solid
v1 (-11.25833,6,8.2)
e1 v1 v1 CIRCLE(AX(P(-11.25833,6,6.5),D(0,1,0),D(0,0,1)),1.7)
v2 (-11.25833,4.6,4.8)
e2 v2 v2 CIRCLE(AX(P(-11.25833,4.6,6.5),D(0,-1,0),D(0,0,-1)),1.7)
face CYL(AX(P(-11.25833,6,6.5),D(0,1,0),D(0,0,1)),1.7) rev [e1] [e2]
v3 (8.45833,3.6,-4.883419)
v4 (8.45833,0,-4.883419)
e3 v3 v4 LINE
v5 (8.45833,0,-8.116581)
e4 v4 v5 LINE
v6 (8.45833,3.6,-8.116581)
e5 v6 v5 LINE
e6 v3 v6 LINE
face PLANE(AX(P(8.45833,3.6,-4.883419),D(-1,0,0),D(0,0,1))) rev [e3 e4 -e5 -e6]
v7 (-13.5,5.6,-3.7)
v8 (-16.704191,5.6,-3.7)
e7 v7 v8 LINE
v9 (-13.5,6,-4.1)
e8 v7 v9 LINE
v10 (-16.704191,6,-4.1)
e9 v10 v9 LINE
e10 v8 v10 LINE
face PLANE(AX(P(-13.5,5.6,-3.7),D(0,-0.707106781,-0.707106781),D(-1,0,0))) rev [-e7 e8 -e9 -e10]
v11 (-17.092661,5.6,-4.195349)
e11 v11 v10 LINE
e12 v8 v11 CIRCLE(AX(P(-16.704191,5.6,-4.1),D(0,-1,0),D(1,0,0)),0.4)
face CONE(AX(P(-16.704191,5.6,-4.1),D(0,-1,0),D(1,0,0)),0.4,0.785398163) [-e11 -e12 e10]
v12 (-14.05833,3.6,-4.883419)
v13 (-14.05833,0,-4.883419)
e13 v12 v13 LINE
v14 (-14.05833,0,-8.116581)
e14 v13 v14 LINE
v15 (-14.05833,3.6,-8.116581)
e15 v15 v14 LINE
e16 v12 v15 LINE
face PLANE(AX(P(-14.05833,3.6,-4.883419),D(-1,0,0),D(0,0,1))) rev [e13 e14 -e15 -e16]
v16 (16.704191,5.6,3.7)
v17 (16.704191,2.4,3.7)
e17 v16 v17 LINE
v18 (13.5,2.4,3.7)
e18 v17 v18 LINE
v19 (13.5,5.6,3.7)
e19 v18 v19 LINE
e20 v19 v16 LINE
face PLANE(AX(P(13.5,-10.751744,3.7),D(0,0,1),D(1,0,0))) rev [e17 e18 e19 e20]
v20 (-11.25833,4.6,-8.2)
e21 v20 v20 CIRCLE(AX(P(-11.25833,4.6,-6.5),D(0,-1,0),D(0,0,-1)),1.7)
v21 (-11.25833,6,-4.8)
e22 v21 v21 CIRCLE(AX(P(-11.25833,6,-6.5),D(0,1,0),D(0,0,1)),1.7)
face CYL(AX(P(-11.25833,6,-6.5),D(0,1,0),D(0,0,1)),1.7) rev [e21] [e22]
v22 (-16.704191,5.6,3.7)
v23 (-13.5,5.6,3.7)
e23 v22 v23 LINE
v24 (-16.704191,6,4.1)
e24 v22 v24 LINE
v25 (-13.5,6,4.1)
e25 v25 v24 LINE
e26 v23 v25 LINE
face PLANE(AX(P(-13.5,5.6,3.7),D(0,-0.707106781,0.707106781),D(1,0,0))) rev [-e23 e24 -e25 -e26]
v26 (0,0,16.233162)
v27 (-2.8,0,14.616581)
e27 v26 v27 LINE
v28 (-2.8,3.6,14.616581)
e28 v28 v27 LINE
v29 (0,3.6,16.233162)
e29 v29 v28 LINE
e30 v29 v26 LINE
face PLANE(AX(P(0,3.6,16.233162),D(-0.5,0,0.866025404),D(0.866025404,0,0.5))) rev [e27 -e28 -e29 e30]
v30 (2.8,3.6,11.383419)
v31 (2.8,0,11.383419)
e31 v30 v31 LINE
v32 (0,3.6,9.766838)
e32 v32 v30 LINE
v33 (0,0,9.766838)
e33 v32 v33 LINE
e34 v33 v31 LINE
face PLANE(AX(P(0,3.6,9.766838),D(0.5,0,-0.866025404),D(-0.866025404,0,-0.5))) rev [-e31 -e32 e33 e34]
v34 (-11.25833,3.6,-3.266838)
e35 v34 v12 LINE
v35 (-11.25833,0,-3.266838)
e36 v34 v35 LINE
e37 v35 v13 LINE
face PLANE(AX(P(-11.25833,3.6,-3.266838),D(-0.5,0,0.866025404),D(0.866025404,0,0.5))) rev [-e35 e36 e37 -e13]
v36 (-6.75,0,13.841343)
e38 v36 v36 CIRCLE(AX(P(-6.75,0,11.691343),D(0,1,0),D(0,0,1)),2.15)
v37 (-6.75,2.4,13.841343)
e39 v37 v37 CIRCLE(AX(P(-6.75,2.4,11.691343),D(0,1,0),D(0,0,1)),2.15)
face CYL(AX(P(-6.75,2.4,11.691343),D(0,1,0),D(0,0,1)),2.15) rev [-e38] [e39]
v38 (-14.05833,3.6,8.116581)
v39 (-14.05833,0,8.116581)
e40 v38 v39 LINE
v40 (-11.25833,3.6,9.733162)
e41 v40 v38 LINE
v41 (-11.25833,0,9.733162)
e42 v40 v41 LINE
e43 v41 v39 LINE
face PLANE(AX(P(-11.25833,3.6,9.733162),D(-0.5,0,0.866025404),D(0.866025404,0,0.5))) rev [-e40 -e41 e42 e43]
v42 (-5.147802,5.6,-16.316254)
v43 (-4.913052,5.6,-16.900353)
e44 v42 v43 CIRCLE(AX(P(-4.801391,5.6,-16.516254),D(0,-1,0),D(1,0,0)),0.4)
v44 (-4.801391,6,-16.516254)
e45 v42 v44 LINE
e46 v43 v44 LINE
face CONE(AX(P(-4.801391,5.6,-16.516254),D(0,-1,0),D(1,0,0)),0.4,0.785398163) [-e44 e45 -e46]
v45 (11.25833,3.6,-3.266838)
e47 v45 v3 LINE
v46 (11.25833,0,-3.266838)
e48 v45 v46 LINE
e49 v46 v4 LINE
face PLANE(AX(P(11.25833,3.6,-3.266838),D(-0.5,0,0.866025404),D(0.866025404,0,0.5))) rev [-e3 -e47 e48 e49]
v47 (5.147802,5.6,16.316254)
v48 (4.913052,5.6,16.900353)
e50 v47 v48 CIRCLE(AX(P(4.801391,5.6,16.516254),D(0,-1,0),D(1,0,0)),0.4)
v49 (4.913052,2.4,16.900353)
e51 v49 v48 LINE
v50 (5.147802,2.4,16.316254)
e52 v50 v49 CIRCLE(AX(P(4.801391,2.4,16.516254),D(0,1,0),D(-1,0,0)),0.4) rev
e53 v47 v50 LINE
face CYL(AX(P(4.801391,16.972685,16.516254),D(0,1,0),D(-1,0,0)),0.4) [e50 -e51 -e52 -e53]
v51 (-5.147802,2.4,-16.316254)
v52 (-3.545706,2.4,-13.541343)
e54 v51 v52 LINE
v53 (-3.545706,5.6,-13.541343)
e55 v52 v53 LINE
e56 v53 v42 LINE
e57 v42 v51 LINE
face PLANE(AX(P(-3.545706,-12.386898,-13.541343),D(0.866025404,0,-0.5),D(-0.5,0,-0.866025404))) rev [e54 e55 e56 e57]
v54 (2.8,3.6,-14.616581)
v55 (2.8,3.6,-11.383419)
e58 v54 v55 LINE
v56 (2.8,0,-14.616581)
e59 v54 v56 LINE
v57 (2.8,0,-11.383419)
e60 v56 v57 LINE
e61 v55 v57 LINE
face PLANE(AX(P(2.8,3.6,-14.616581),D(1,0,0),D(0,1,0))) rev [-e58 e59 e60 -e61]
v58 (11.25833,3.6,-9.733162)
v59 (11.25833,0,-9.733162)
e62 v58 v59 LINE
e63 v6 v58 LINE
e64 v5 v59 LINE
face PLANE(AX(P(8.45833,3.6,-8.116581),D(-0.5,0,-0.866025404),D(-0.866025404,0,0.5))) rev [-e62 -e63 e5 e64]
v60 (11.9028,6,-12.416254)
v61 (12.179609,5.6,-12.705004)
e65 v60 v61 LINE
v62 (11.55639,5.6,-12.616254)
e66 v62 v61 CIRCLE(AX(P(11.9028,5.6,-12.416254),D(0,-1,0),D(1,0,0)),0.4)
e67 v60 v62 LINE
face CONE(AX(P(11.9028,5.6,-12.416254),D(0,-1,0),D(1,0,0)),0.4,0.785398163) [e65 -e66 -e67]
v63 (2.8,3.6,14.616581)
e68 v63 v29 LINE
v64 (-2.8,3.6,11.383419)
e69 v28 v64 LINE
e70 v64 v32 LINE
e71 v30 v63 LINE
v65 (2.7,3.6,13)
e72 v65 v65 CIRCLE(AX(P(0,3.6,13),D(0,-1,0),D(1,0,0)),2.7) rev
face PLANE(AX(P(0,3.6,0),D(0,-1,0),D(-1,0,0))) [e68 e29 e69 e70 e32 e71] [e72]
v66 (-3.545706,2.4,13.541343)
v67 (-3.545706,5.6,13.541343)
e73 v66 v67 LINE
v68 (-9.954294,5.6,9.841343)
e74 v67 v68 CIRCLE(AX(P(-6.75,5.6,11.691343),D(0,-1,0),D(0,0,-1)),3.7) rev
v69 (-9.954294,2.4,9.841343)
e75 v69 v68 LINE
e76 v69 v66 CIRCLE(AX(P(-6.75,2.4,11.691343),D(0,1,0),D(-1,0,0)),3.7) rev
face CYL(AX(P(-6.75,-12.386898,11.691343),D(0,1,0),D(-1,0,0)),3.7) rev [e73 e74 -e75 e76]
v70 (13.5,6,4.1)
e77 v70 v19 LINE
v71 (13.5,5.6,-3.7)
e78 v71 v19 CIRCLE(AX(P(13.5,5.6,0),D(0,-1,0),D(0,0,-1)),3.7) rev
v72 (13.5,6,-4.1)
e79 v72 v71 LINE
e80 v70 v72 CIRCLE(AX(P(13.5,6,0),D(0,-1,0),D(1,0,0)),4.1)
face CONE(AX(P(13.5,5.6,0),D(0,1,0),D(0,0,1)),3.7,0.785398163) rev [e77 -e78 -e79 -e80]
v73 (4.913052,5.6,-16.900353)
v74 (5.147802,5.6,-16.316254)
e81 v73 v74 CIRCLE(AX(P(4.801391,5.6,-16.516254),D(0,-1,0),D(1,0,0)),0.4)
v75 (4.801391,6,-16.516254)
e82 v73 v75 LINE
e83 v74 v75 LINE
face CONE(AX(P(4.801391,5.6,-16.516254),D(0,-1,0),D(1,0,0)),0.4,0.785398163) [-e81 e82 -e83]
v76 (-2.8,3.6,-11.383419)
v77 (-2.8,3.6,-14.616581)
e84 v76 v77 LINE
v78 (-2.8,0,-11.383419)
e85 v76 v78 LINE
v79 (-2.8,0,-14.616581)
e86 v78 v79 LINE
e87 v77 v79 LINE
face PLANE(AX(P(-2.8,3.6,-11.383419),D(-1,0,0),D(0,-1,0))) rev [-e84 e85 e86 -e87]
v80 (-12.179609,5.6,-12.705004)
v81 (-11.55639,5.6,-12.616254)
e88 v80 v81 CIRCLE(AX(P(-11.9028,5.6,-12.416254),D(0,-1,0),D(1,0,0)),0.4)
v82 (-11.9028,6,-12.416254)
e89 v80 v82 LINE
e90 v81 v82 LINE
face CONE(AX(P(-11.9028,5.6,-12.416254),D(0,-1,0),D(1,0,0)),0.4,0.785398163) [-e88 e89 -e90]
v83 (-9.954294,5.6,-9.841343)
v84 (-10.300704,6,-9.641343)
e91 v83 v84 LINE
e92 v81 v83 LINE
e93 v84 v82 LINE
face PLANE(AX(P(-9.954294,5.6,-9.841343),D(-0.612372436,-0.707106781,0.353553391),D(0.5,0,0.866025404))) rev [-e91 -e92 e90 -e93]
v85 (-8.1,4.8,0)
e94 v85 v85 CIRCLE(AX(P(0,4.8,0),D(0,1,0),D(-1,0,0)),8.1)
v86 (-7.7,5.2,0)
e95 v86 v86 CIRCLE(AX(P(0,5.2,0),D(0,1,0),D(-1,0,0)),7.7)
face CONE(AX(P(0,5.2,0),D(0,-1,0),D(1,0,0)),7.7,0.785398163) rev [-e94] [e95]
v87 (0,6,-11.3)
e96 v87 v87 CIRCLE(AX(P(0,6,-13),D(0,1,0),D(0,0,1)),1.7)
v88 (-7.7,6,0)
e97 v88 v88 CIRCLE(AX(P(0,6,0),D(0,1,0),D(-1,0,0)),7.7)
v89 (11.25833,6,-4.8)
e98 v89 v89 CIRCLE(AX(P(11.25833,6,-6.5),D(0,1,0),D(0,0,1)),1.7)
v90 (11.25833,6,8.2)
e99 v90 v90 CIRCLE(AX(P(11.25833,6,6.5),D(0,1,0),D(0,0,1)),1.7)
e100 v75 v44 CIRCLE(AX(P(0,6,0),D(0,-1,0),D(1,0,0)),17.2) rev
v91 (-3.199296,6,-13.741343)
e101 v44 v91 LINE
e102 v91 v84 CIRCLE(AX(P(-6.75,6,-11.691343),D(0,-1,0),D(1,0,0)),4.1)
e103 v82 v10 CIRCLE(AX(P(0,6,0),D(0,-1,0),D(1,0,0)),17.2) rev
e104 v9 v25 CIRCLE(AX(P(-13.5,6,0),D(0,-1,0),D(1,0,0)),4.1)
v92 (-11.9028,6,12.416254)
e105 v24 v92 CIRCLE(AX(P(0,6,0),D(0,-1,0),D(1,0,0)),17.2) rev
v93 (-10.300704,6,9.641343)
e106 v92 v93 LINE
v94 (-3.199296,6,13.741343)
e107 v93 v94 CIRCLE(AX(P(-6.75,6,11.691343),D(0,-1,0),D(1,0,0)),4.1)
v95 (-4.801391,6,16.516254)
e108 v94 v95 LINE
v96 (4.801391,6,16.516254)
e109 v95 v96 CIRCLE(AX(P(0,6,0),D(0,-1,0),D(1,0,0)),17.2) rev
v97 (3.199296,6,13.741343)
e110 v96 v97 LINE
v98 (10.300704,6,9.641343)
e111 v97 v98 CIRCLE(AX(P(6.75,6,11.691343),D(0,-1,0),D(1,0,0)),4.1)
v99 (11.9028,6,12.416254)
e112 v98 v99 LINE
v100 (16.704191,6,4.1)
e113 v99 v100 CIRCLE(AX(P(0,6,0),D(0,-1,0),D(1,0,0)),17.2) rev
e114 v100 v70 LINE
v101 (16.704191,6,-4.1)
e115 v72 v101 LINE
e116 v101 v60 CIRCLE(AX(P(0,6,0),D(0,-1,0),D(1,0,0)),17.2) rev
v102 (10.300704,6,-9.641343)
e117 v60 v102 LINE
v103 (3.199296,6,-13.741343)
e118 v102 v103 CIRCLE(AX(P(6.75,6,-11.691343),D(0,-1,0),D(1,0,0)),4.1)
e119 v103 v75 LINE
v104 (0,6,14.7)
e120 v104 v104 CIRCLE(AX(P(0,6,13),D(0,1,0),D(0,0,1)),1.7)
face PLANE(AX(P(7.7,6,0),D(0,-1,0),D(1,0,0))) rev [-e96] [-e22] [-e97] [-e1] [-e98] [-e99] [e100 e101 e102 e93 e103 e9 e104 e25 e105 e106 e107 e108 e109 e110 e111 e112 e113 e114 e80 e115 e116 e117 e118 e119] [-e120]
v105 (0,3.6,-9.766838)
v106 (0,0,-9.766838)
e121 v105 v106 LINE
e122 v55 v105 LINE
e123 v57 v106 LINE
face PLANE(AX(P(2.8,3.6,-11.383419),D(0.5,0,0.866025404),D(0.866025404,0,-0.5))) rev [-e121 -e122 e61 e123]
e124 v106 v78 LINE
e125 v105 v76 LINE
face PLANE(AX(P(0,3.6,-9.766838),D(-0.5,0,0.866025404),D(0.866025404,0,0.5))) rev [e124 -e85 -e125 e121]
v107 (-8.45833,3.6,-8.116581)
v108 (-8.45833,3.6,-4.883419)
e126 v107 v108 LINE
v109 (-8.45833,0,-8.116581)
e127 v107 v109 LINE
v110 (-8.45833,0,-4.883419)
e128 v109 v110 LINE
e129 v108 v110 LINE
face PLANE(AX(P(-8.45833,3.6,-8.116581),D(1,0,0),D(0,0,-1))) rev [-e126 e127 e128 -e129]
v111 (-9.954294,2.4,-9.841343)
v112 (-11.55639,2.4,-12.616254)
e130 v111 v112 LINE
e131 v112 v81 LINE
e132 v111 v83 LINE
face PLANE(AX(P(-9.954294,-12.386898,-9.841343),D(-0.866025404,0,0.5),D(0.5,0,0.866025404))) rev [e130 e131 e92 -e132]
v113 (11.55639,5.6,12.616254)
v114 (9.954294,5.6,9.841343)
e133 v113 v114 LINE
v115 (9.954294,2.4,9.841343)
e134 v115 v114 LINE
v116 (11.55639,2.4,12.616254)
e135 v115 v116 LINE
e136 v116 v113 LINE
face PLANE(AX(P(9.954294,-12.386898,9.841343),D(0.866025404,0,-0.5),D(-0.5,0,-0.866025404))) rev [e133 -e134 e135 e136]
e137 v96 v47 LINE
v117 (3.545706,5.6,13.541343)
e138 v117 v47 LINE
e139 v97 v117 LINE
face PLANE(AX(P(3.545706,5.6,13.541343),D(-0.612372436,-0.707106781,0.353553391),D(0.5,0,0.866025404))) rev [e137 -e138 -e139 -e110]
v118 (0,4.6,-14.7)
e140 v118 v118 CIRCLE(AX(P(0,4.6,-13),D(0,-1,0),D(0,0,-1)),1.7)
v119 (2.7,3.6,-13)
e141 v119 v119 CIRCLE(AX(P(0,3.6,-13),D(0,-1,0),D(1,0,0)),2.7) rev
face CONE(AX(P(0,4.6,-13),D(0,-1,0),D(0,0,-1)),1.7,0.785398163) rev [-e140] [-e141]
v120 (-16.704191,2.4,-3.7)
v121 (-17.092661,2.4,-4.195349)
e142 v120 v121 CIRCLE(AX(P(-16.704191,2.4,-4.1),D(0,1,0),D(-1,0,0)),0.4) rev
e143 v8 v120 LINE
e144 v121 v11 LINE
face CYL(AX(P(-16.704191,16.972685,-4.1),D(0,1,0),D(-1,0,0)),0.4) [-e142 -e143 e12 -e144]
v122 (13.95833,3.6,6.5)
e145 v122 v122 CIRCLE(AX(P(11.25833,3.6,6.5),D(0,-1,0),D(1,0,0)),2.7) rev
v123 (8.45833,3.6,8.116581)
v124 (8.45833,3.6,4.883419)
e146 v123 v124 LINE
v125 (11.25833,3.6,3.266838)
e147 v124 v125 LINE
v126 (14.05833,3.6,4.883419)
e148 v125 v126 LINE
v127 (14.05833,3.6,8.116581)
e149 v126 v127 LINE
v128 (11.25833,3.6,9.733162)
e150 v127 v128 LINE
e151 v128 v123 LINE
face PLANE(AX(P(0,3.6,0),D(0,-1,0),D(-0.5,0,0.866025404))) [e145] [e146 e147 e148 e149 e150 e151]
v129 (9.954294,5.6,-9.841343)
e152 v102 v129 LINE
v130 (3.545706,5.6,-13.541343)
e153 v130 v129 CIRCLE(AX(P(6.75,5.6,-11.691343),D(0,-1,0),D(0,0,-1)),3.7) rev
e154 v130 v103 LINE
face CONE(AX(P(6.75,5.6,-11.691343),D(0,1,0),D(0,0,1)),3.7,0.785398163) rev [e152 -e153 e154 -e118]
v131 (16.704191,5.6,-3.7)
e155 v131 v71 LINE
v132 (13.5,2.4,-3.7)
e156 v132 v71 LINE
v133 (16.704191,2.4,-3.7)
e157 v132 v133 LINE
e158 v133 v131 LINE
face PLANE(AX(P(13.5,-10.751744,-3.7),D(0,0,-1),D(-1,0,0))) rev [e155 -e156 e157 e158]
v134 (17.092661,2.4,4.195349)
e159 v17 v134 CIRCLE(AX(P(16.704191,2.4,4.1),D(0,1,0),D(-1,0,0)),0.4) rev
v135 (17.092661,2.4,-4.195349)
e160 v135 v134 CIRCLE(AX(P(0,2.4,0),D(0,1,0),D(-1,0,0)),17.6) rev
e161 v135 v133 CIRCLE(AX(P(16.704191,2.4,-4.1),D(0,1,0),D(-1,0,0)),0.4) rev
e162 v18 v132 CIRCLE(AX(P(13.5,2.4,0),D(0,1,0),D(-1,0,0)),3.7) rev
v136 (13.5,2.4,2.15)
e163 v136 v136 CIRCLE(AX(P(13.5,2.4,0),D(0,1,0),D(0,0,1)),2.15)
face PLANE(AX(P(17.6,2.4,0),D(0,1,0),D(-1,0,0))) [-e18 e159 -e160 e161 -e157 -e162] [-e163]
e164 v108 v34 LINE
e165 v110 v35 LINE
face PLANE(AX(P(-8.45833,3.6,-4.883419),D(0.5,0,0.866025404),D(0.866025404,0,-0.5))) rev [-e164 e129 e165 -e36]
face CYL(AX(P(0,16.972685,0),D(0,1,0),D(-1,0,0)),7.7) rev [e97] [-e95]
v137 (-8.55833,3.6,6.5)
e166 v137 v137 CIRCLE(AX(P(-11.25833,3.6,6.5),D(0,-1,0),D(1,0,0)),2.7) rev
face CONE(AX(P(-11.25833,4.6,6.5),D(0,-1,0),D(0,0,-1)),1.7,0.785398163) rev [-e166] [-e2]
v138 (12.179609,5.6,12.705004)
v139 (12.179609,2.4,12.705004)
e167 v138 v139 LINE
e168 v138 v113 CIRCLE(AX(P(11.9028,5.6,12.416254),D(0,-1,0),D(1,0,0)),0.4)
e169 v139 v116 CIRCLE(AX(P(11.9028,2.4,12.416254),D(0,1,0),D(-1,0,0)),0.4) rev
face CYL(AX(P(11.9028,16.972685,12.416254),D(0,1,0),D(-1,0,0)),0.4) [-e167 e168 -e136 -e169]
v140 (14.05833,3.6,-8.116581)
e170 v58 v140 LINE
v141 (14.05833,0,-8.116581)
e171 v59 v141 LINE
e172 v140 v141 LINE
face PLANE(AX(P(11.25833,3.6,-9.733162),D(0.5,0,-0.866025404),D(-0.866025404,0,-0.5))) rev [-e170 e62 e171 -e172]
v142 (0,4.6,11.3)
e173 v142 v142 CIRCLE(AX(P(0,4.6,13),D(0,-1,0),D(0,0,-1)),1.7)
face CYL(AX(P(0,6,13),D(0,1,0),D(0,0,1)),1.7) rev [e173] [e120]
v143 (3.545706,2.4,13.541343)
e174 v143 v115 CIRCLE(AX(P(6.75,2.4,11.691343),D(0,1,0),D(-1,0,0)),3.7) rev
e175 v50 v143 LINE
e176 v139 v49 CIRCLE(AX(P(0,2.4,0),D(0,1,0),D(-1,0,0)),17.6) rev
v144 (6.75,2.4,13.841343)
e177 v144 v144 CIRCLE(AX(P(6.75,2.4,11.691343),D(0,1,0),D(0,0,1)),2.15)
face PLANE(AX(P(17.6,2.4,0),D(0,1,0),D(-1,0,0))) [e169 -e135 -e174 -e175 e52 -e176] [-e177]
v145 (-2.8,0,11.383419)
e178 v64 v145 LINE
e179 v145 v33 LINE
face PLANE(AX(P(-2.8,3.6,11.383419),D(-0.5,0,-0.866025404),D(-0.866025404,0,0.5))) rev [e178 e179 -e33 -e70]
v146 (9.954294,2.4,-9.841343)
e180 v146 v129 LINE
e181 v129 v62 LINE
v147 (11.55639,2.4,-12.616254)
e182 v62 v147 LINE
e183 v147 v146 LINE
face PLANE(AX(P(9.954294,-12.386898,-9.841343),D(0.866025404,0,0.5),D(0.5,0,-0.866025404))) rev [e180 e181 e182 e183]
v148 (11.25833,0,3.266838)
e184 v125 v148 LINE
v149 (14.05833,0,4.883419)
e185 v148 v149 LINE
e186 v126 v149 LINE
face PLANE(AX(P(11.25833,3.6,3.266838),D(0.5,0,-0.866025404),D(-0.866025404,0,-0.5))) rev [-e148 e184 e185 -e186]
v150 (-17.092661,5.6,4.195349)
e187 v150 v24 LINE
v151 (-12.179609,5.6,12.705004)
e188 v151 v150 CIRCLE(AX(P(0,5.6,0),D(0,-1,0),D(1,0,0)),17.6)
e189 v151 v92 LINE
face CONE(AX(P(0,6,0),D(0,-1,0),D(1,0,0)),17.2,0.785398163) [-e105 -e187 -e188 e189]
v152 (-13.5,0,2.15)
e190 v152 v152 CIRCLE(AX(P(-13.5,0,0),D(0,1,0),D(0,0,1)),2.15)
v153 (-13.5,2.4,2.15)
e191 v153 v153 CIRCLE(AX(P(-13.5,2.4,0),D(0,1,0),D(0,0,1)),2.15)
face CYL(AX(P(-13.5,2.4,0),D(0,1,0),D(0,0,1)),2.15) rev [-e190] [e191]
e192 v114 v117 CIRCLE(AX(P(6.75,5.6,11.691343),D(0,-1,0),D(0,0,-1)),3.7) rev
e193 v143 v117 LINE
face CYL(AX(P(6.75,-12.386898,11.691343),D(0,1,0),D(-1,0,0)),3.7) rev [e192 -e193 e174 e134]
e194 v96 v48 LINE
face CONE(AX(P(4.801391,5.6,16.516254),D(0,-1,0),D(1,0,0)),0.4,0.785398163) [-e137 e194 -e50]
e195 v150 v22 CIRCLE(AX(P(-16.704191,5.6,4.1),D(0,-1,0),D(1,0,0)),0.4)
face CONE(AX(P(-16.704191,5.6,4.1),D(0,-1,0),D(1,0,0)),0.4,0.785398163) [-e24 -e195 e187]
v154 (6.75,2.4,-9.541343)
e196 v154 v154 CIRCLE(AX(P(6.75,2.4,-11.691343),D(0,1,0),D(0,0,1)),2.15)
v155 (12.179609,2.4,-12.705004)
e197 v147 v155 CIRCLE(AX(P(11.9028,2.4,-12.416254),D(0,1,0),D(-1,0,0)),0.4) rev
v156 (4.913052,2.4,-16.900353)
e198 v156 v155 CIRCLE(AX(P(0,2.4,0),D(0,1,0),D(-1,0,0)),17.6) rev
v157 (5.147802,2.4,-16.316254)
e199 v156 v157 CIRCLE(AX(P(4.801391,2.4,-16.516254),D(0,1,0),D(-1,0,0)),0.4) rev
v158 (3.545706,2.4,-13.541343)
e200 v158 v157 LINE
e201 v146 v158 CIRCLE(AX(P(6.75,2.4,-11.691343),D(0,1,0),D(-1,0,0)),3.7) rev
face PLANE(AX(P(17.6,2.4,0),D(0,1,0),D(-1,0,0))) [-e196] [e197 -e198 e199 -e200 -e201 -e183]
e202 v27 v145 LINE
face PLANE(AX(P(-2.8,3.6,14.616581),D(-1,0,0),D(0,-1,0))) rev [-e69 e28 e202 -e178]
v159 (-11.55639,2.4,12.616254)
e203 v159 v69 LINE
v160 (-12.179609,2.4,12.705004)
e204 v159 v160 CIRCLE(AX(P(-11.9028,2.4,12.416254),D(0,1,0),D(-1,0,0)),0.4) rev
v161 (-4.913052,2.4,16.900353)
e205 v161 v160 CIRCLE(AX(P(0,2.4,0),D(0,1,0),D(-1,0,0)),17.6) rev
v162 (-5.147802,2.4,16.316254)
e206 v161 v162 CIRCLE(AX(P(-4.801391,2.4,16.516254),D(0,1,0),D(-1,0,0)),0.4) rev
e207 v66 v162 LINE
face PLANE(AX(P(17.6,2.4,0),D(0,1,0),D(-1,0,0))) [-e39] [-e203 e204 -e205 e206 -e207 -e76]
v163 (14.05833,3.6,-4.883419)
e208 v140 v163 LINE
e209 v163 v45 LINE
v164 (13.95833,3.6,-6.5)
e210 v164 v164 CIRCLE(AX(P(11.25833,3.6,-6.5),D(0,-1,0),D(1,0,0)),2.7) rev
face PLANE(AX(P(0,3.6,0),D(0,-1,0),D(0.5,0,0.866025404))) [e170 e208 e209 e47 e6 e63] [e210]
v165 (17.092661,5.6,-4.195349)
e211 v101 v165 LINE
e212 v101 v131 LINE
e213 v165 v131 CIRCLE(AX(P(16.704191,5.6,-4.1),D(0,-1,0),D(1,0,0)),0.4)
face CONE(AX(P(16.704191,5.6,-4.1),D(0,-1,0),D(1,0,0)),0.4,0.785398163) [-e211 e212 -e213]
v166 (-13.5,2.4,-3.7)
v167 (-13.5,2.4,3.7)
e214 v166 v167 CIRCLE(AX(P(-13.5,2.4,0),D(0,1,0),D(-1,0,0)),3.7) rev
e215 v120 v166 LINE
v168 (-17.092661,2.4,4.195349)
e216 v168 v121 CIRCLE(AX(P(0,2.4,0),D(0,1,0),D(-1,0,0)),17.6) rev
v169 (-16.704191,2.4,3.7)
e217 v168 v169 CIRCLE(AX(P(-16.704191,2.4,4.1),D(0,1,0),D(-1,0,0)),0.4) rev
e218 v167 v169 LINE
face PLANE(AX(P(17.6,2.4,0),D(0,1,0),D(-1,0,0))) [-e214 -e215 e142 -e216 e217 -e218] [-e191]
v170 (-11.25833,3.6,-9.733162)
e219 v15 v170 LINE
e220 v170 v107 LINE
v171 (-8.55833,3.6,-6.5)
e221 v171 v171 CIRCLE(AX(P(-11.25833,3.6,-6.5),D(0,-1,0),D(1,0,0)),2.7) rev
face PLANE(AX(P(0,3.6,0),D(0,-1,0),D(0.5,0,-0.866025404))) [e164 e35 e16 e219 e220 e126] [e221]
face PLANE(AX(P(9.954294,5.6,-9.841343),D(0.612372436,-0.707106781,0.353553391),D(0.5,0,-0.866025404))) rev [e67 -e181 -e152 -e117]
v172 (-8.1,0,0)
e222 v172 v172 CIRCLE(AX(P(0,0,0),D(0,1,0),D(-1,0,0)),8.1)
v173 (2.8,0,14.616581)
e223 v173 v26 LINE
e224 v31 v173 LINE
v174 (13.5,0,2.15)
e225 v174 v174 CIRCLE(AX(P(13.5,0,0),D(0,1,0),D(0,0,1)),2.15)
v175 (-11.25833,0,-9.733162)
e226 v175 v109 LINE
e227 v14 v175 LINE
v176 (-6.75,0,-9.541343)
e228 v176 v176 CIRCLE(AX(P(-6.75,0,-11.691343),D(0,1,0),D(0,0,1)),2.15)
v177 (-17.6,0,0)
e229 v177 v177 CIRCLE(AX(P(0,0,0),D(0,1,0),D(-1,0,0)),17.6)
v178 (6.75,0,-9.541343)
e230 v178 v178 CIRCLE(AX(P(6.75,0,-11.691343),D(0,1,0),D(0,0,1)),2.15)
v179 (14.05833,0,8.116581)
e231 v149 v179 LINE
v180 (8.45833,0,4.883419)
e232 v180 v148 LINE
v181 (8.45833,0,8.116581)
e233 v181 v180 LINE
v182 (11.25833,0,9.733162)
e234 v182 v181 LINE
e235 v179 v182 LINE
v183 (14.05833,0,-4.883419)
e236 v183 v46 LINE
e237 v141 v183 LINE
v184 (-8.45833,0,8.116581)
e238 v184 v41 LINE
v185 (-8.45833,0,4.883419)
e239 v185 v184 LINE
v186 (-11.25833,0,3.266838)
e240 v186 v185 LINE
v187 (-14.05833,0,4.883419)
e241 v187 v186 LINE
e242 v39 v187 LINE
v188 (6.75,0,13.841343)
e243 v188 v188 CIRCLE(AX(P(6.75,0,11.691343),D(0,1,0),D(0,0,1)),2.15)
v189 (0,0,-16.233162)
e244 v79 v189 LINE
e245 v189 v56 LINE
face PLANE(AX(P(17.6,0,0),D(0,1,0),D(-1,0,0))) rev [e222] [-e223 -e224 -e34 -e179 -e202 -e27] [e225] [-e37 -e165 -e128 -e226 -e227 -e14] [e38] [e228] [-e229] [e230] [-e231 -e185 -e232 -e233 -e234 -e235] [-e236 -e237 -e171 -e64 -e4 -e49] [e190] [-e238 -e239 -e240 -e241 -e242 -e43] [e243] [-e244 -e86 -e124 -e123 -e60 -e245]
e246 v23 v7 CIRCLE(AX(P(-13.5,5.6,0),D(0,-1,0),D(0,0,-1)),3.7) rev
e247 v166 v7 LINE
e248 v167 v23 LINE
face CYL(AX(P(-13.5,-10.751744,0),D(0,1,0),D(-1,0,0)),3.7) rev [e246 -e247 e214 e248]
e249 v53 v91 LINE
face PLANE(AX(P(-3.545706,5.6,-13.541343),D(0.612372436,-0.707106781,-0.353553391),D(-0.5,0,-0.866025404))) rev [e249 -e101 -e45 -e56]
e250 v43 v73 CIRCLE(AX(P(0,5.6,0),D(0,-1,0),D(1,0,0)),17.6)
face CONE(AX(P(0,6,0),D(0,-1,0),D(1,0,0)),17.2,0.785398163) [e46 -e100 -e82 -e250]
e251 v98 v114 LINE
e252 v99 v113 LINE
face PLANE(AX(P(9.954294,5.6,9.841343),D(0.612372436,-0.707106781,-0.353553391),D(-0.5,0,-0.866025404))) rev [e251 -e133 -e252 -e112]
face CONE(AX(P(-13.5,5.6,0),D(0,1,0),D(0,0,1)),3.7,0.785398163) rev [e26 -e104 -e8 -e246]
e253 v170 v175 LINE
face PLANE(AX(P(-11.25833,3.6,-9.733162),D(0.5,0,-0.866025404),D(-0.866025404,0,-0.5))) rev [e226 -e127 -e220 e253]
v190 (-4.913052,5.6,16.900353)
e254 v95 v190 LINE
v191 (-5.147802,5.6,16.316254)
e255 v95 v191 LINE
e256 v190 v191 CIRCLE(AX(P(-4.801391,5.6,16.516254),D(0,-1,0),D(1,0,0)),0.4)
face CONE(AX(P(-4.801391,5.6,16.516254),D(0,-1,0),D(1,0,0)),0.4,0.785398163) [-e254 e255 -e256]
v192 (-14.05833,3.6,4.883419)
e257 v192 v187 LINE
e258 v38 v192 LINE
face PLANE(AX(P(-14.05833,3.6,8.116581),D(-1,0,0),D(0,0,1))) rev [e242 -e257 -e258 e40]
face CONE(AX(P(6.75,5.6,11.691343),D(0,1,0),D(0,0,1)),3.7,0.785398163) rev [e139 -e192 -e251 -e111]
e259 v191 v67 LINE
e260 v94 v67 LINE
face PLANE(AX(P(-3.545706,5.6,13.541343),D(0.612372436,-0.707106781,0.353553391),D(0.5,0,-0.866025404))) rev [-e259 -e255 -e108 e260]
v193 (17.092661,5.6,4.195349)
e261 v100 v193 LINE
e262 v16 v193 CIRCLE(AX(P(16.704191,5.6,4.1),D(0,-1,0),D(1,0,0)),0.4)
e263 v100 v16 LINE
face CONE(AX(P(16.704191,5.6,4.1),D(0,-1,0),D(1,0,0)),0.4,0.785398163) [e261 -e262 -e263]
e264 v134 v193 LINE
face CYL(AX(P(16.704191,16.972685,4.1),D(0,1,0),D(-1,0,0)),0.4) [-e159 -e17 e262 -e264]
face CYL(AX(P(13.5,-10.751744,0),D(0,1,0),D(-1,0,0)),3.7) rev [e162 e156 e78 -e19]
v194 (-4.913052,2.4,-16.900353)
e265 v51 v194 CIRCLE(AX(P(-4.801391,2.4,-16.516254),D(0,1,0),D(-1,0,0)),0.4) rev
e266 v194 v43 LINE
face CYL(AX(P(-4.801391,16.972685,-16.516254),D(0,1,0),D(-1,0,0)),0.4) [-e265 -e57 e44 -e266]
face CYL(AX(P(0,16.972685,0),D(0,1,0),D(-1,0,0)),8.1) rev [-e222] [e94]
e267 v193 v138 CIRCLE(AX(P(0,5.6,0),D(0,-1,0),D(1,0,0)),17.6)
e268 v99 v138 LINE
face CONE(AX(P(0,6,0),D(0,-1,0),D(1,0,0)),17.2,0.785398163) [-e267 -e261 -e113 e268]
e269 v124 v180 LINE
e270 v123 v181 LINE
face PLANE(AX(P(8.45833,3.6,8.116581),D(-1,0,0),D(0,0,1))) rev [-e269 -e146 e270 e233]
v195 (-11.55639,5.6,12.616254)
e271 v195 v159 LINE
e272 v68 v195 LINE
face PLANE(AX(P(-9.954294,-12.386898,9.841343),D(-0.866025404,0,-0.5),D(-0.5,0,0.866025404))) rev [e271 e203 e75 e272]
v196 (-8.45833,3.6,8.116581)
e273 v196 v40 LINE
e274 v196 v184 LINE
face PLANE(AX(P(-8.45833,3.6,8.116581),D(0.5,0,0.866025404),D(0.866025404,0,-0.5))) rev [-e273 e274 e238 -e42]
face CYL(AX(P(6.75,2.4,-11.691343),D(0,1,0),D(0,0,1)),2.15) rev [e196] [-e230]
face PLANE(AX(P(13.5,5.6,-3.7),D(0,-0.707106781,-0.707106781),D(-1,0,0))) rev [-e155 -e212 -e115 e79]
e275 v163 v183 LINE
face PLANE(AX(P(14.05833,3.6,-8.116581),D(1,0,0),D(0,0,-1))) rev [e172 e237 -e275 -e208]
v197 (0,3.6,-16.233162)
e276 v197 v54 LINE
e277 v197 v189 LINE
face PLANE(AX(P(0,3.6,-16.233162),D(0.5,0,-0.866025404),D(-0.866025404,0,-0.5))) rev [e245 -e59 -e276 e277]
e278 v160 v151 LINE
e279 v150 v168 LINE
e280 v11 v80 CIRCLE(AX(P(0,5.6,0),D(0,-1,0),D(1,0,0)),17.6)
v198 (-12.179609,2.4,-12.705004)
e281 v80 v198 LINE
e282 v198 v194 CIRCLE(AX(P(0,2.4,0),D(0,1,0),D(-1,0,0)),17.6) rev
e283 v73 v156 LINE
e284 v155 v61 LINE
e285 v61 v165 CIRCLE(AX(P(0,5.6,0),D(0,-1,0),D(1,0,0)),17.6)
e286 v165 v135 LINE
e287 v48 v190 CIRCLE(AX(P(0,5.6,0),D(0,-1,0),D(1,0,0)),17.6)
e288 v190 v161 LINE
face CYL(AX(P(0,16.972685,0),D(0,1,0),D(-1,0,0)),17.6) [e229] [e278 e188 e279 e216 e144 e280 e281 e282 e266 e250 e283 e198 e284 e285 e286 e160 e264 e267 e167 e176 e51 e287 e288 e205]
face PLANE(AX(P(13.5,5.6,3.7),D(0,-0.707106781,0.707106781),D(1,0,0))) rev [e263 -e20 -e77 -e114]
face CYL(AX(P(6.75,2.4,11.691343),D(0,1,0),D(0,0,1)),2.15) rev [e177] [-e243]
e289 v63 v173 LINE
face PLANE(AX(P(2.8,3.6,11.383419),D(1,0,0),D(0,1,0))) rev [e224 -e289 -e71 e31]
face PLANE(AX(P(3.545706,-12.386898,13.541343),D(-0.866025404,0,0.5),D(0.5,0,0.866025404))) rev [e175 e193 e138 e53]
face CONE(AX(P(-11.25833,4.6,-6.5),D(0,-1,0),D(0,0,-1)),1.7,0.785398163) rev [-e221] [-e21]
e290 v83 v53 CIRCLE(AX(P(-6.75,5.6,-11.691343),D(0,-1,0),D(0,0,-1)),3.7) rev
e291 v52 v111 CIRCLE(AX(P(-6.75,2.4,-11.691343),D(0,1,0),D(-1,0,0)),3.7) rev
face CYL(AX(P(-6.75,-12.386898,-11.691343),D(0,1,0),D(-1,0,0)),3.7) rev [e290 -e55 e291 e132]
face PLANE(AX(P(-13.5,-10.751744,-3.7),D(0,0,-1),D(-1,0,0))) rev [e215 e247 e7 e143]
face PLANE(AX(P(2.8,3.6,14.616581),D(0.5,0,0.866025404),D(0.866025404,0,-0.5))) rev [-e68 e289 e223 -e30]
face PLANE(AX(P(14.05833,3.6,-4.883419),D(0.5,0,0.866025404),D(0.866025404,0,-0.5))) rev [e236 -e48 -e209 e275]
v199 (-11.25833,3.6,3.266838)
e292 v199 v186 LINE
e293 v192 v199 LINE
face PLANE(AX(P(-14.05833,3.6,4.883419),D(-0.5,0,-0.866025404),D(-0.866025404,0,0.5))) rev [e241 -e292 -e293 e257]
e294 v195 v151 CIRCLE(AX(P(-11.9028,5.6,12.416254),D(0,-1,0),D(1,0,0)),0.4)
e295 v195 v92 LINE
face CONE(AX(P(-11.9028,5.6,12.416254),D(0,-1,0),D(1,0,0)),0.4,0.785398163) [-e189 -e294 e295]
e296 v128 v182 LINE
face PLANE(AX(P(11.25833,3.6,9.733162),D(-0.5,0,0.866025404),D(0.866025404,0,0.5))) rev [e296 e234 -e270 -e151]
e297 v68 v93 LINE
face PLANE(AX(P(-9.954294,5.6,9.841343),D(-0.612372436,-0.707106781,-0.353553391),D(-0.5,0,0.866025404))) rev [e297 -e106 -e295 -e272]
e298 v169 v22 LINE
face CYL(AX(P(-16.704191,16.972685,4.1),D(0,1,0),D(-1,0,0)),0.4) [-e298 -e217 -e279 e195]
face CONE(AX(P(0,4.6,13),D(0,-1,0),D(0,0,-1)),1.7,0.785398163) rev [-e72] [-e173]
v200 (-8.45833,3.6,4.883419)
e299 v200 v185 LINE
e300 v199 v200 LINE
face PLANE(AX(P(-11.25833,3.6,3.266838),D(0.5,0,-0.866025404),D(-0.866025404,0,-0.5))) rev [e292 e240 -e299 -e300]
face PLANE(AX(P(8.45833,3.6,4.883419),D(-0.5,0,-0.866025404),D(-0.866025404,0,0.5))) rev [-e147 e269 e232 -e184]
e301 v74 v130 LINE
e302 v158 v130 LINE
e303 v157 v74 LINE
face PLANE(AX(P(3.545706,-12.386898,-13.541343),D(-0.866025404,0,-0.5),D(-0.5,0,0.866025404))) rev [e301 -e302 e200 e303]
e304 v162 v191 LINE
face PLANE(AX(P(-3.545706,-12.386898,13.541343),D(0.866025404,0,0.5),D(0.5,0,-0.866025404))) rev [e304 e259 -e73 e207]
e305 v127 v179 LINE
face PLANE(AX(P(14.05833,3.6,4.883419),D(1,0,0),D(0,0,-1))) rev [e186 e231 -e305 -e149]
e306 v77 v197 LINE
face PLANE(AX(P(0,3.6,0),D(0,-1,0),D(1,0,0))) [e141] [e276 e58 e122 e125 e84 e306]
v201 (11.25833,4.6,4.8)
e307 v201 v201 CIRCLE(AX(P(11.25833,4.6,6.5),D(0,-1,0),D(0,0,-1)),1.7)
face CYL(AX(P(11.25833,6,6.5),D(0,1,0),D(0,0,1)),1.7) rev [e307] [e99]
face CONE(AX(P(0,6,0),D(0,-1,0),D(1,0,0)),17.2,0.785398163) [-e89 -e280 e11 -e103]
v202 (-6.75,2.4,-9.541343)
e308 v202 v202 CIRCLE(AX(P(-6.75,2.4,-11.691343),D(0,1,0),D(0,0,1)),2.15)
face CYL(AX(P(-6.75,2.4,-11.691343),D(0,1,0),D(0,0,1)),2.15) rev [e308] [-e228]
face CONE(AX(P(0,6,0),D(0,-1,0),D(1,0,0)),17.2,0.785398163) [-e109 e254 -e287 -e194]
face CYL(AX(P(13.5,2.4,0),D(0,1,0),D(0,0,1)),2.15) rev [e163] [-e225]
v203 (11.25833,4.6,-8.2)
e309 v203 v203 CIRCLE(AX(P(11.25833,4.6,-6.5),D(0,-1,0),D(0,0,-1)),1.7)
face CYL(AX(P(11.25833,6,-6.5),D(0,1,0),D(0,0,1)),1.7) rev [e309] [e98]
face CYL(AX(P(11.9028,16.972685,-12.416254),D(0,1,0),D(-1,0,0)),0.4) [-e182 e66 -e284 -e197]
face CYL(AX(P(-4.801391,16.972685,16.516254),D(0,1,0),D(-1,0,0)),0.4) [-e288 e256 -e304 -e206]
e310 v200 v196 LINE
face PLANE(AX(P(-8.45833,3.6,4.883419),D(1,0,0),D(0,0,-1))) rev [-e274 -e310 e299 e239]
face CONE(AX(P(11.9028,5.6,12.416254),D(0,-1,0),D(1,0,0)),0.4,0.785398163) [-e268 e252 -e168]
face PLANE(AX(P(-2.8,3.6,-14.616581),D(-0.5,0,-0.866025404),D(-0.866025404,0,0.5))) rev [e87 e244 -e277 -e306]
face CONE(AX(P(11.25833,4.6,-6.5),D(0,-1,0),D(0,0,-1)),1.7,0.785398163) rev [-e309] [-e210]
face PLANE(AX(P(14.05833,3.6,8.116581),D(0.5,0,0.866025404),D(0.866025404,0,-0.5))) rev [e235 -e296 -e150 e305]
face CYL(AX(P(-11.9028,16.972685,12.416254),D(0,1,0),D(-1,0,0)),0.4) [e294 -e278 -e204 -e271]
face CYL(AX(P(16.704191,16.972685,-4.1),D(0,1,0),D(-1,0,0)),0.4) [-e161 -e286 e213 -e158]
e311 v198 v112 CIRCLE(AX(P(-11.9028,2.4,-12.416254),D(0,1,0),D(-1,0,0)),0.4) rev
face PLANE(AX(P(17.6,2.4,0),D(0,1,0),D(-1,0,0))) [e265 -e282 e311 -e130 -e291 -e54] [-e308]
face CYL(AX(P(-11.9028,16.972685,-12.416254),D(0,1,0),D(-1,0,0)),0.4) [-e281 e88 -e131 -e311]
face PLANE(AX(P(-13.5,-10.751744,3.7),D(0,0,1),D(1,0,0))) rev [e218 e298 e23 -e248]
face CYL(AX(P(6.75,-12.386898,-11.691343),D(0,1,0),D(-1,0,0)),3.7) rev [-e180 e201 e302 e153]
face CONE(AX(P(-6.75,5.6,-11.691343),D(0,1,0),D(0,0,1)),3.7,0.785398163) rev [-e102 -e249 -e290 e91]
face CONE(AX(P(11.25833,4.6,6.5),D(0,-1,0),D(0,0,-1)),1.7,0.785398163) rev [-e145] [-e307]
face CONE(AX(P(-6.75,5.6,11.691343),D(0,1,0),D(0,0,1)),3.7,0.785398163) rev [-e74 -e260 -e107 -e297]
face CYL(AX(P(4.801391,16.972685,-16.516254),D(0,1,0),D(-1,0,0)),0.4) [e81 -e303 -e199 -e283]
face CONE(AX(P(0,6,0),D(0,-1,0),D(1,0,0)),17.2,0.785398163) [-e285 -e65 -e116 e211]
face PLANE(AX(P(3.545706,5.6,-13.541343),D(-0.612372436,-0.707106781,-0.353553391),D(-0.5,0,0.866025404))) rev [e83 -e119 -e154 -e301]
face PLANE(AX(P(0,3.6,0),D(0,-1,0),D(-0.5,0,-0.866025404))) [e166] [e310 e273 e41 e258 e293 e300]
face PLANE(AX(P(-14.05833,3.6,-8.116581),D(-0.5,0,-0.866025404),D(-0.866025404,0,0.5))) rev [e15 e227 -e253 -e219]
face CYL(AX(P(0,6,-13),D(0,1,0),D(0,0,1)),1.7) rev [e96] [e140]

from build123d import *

# Parameters (mm, degrees)
CUT_EXTRUDE1_START           = -3.6
CUT_EXTRUDE1_DEPTH           = 3.6
CUT_EXTRUDE2_DEPTH           = 3.6
M3_CLEARANCE_HOLE3_D         = 3.4
CHAMFER2_SIZE                = 1
M4_CLEARANCE_HOLE2_D         = 4.3
CIRPATTERN2_COUNT            = 6
CHAMFER2_OF_CIRPATTERN2_SIZE = 1
FILLET1_R                    = 0.4
CHAMFER1_SIZE                = 0.4


with BuildPart() as part:
    # Sketch8 → Revolve1 (revolve)
    with BuildSketch(Plane.XY, mode=Mode.PRIVATE) as revolve1_sk:
        Polygon((8.1, 0), (8.1, 4.8), (7.7, 5.2), (7.7, 6), (17.6, 6), (17.6, 0), align=None)
    revolve(revolve1_sk.sketch.rotate(Axis((0, 16.972685485, 0), (0, -1, 0)), 180), axis=Axis((0, 16.972685485, 0), (0, -1, 0)))

    # Sketch2 → Cut-Extrude1 (cut)
    with BuildSketch(Plane(origin=(0, 6, 0), x_dir=(1, 0, 0), z_dir=(0, 1, 0)).offset(CUT_EXTRUDE1_START)):
        with BuildLine():
            Line((13.5, 3.7), (17.206684748, 3.7))
            ThreePointArc((17.206684748, 3.7), (17.6, 0), (17.206684748, -3.7))
            Line((17.206684748, -3.7), (13.5, -3.7))
            ThreePointArc((13.5, -3.7), (9.8, 0), (13.5, 3.7))
        make_face()
    cut_extrude1 = extrude(amount=CUT_EXTRUDE1_DEPTH, mode=Mode.SUBTRACT)

    # Sketch5 → Cut-Extrude2 (cut)
    with BuildSketch(Plane.XZ):
        Polygon((2.8, -14.616580754), (2.8, -11.383419246), (0, -9.766838493), (-2.8, -11.383419246), (-2.8, -14.616580754), (0, -16.233161507), align=None)
    cut_extrude2 = extrude(amount=-CUT_EXTRUDE2_DEPTH, mode=Mode.SUBTRACT)

    # M3 Clearance Hole3 (through all)
    with Locations(Plane(origin=(0, 6, 0), x_dir=(1, 0, 0), z_dir=(0, 1, 0))):
        with Locations((0, 13)):
            m3_clearance_hole3 = Hole(M3_CLEARANCE_HOLE3_D / 2)

    # Chamfer2
    chamfer2_edges = [part.edges().sort_by_distance(p)[0] for p in [
        (1.7, 3.6, -13),
    ]]
    chamfer(chamfer2_edges, length=CHAMFER2_SIZE)

    # M4 Clearance Hole2 (through all)
    with Locations(Plane(origin=(0, 2.4, 0), x_dir=(1, 0, 0), z_dir=(0, 1, 0))):
        with Locations((13.5, 0)):
            m4_clearance_hole2 = Hole(M4_CLEARANCE_HOLE2_D / 2)

    # CirPattern2: Cut-Extrude1, Cut-Extrude2, M3 Clearance Hole3, M4 Clearance Hole2 ×6 about axis
    cirpattern2_axis = Axis((0, 0, 0), (0, 1, 0))
    add([cut_extrude1.rotate(cirpattern2_axis, i * 360 / CIRPATTERN2_COUNT) for i in range(1, CIRPATTERN2_COUNT)], mode=Mode.SUBTRACT)
    add([cut_extrude2.rotate(cirpattern2_axis, i * 360 / CIRPATTERN2_COUNT) for i in range(1, CIRPATTERN2_COUNT)], mode=Mode.SUBTRACT)
    add([m3_clearance_hole3.rotate(cirpattern2_axis, i * 360 / CIRPATTERN2_COUNT) for i in range(1, CIRPATTERN2_COUNT)], mode=Mode.SUBTRACT)
    add([m4_clearance_hole2.rotate(cirpattern2_axis, i * 360 / CIRPATTERN2_COUNT) for i in range(1, CIRPATTERN2_COUNT)], mode=Mode.SUBTRACT)

    # Chamfer2 of CirPattern2
    chamfer2_of_cirpattern2_edges = [part.edges().sort_by_distance(p)[0] for p in [
        (-10.408330249, 3.6, -7.972243186),
        (-12.108330249, 3.6, 5.027756814),
        (-1.7, 3.6, 13),
        (10.408330249, 3.6, 7.972243186),
        (12.108330249, 3.6, -5.027756814),
    ]]
    chamfer(chamfer2_of_cirpattern2_edges, length=CHAMFER2_OF_CIRPATTERN2_SIZE)

    # Fillet1
    fillet1_edges = [part.edges().sort_by_distance(p)[0] for p in [
        (-5.39904838, 4.2, 16.751426106),
        (-11.807636368, 4.2, 13.051426106),
        (11.807636368, 4.2, 13.051426106),
        (5.39904838, 4.2, 16.751426106),
        (17.206684748, 4.2, -3.7),
        (17.206684748, 4.2, 3.7),
        (5.39904838, 4.2, -16.751426106),
        (11.807636368, 4.2, -13.051426106),
        (-11.807636368, 4.2, -13.051426106),
        (-5.39904838, 4.2, -16.751426106),
        (-17.206684748, 4.2, 3.7),
        (-17.206684748, 4.2, -3.7),
    ]]
    fillet(fillet1_edges, radius=FILLET1_R)

    # Chamfer1
    chamfer1_edges = [part.edges().sort_by_distance(p)[0] for p in [
        (-4.9, 6, 8.487048957),
        (-10.755341767, 6, 11.228798393),
        (4.9, 6, 8.487048957),
        (4.346753779, 6, 14.928798393),
        (9.8, 6, 0),
        (15.102095545, 6, 3.7),
        (-4.346753779, 6, 14.928798393),
        (4.346753779, 6, -14.928798393),
        (0, 6, -17.6),
        (-10.755341767, 6, -11.228798393),
        (-15.242047107, 6, -8.8),
        (-15.102095545, 6, 3.7),
        (-15.242047107, 6, 8.8),
        (0, 6, 17.6),
        (10.755341767, 6, 11.228798393),
        (15.242047107, 6, 8.8),
        (15.102095545, 6, -3.7),
        (15.242047107, 6, -8.8),
        (5.172538285, 6, 16.665418113),
        (11.846406308, 6, 12.812258614),
        (17.018944594, 6, 3.8531595),
        (17.018944594, 6, -3.8531595),
        (11.846406308, 6, -12.812258614),
        (5.172538285, 6, -16.665418113),
        (-5.172538285, 6, -16.665418113),
        (-11.846406308, 6, -12.812258614),
        (-17.018944594, 6, -3.8531595),
        (-17.018944594, 6, 3.8531595),
        (-11.846406308, 6, 12.812258614),
        (-5.172538285, 6, 16.665418113),
        (4.9, 6, -8.487048957),
        (10.755341767, 6, -11.228798393),
        (-4.9, 6, -8.487048957),
        (-4.346753779, 6, -14.928798393),
        (-9.8, 6, 0),
        (-15.102095545, 6, -3.7),
    ]]
    chamfer(chamfer1_edges, length=CHAMFER1_SIZE - 0.0001)  # a hair under: the kernel refuses the full size


solid = part.part
